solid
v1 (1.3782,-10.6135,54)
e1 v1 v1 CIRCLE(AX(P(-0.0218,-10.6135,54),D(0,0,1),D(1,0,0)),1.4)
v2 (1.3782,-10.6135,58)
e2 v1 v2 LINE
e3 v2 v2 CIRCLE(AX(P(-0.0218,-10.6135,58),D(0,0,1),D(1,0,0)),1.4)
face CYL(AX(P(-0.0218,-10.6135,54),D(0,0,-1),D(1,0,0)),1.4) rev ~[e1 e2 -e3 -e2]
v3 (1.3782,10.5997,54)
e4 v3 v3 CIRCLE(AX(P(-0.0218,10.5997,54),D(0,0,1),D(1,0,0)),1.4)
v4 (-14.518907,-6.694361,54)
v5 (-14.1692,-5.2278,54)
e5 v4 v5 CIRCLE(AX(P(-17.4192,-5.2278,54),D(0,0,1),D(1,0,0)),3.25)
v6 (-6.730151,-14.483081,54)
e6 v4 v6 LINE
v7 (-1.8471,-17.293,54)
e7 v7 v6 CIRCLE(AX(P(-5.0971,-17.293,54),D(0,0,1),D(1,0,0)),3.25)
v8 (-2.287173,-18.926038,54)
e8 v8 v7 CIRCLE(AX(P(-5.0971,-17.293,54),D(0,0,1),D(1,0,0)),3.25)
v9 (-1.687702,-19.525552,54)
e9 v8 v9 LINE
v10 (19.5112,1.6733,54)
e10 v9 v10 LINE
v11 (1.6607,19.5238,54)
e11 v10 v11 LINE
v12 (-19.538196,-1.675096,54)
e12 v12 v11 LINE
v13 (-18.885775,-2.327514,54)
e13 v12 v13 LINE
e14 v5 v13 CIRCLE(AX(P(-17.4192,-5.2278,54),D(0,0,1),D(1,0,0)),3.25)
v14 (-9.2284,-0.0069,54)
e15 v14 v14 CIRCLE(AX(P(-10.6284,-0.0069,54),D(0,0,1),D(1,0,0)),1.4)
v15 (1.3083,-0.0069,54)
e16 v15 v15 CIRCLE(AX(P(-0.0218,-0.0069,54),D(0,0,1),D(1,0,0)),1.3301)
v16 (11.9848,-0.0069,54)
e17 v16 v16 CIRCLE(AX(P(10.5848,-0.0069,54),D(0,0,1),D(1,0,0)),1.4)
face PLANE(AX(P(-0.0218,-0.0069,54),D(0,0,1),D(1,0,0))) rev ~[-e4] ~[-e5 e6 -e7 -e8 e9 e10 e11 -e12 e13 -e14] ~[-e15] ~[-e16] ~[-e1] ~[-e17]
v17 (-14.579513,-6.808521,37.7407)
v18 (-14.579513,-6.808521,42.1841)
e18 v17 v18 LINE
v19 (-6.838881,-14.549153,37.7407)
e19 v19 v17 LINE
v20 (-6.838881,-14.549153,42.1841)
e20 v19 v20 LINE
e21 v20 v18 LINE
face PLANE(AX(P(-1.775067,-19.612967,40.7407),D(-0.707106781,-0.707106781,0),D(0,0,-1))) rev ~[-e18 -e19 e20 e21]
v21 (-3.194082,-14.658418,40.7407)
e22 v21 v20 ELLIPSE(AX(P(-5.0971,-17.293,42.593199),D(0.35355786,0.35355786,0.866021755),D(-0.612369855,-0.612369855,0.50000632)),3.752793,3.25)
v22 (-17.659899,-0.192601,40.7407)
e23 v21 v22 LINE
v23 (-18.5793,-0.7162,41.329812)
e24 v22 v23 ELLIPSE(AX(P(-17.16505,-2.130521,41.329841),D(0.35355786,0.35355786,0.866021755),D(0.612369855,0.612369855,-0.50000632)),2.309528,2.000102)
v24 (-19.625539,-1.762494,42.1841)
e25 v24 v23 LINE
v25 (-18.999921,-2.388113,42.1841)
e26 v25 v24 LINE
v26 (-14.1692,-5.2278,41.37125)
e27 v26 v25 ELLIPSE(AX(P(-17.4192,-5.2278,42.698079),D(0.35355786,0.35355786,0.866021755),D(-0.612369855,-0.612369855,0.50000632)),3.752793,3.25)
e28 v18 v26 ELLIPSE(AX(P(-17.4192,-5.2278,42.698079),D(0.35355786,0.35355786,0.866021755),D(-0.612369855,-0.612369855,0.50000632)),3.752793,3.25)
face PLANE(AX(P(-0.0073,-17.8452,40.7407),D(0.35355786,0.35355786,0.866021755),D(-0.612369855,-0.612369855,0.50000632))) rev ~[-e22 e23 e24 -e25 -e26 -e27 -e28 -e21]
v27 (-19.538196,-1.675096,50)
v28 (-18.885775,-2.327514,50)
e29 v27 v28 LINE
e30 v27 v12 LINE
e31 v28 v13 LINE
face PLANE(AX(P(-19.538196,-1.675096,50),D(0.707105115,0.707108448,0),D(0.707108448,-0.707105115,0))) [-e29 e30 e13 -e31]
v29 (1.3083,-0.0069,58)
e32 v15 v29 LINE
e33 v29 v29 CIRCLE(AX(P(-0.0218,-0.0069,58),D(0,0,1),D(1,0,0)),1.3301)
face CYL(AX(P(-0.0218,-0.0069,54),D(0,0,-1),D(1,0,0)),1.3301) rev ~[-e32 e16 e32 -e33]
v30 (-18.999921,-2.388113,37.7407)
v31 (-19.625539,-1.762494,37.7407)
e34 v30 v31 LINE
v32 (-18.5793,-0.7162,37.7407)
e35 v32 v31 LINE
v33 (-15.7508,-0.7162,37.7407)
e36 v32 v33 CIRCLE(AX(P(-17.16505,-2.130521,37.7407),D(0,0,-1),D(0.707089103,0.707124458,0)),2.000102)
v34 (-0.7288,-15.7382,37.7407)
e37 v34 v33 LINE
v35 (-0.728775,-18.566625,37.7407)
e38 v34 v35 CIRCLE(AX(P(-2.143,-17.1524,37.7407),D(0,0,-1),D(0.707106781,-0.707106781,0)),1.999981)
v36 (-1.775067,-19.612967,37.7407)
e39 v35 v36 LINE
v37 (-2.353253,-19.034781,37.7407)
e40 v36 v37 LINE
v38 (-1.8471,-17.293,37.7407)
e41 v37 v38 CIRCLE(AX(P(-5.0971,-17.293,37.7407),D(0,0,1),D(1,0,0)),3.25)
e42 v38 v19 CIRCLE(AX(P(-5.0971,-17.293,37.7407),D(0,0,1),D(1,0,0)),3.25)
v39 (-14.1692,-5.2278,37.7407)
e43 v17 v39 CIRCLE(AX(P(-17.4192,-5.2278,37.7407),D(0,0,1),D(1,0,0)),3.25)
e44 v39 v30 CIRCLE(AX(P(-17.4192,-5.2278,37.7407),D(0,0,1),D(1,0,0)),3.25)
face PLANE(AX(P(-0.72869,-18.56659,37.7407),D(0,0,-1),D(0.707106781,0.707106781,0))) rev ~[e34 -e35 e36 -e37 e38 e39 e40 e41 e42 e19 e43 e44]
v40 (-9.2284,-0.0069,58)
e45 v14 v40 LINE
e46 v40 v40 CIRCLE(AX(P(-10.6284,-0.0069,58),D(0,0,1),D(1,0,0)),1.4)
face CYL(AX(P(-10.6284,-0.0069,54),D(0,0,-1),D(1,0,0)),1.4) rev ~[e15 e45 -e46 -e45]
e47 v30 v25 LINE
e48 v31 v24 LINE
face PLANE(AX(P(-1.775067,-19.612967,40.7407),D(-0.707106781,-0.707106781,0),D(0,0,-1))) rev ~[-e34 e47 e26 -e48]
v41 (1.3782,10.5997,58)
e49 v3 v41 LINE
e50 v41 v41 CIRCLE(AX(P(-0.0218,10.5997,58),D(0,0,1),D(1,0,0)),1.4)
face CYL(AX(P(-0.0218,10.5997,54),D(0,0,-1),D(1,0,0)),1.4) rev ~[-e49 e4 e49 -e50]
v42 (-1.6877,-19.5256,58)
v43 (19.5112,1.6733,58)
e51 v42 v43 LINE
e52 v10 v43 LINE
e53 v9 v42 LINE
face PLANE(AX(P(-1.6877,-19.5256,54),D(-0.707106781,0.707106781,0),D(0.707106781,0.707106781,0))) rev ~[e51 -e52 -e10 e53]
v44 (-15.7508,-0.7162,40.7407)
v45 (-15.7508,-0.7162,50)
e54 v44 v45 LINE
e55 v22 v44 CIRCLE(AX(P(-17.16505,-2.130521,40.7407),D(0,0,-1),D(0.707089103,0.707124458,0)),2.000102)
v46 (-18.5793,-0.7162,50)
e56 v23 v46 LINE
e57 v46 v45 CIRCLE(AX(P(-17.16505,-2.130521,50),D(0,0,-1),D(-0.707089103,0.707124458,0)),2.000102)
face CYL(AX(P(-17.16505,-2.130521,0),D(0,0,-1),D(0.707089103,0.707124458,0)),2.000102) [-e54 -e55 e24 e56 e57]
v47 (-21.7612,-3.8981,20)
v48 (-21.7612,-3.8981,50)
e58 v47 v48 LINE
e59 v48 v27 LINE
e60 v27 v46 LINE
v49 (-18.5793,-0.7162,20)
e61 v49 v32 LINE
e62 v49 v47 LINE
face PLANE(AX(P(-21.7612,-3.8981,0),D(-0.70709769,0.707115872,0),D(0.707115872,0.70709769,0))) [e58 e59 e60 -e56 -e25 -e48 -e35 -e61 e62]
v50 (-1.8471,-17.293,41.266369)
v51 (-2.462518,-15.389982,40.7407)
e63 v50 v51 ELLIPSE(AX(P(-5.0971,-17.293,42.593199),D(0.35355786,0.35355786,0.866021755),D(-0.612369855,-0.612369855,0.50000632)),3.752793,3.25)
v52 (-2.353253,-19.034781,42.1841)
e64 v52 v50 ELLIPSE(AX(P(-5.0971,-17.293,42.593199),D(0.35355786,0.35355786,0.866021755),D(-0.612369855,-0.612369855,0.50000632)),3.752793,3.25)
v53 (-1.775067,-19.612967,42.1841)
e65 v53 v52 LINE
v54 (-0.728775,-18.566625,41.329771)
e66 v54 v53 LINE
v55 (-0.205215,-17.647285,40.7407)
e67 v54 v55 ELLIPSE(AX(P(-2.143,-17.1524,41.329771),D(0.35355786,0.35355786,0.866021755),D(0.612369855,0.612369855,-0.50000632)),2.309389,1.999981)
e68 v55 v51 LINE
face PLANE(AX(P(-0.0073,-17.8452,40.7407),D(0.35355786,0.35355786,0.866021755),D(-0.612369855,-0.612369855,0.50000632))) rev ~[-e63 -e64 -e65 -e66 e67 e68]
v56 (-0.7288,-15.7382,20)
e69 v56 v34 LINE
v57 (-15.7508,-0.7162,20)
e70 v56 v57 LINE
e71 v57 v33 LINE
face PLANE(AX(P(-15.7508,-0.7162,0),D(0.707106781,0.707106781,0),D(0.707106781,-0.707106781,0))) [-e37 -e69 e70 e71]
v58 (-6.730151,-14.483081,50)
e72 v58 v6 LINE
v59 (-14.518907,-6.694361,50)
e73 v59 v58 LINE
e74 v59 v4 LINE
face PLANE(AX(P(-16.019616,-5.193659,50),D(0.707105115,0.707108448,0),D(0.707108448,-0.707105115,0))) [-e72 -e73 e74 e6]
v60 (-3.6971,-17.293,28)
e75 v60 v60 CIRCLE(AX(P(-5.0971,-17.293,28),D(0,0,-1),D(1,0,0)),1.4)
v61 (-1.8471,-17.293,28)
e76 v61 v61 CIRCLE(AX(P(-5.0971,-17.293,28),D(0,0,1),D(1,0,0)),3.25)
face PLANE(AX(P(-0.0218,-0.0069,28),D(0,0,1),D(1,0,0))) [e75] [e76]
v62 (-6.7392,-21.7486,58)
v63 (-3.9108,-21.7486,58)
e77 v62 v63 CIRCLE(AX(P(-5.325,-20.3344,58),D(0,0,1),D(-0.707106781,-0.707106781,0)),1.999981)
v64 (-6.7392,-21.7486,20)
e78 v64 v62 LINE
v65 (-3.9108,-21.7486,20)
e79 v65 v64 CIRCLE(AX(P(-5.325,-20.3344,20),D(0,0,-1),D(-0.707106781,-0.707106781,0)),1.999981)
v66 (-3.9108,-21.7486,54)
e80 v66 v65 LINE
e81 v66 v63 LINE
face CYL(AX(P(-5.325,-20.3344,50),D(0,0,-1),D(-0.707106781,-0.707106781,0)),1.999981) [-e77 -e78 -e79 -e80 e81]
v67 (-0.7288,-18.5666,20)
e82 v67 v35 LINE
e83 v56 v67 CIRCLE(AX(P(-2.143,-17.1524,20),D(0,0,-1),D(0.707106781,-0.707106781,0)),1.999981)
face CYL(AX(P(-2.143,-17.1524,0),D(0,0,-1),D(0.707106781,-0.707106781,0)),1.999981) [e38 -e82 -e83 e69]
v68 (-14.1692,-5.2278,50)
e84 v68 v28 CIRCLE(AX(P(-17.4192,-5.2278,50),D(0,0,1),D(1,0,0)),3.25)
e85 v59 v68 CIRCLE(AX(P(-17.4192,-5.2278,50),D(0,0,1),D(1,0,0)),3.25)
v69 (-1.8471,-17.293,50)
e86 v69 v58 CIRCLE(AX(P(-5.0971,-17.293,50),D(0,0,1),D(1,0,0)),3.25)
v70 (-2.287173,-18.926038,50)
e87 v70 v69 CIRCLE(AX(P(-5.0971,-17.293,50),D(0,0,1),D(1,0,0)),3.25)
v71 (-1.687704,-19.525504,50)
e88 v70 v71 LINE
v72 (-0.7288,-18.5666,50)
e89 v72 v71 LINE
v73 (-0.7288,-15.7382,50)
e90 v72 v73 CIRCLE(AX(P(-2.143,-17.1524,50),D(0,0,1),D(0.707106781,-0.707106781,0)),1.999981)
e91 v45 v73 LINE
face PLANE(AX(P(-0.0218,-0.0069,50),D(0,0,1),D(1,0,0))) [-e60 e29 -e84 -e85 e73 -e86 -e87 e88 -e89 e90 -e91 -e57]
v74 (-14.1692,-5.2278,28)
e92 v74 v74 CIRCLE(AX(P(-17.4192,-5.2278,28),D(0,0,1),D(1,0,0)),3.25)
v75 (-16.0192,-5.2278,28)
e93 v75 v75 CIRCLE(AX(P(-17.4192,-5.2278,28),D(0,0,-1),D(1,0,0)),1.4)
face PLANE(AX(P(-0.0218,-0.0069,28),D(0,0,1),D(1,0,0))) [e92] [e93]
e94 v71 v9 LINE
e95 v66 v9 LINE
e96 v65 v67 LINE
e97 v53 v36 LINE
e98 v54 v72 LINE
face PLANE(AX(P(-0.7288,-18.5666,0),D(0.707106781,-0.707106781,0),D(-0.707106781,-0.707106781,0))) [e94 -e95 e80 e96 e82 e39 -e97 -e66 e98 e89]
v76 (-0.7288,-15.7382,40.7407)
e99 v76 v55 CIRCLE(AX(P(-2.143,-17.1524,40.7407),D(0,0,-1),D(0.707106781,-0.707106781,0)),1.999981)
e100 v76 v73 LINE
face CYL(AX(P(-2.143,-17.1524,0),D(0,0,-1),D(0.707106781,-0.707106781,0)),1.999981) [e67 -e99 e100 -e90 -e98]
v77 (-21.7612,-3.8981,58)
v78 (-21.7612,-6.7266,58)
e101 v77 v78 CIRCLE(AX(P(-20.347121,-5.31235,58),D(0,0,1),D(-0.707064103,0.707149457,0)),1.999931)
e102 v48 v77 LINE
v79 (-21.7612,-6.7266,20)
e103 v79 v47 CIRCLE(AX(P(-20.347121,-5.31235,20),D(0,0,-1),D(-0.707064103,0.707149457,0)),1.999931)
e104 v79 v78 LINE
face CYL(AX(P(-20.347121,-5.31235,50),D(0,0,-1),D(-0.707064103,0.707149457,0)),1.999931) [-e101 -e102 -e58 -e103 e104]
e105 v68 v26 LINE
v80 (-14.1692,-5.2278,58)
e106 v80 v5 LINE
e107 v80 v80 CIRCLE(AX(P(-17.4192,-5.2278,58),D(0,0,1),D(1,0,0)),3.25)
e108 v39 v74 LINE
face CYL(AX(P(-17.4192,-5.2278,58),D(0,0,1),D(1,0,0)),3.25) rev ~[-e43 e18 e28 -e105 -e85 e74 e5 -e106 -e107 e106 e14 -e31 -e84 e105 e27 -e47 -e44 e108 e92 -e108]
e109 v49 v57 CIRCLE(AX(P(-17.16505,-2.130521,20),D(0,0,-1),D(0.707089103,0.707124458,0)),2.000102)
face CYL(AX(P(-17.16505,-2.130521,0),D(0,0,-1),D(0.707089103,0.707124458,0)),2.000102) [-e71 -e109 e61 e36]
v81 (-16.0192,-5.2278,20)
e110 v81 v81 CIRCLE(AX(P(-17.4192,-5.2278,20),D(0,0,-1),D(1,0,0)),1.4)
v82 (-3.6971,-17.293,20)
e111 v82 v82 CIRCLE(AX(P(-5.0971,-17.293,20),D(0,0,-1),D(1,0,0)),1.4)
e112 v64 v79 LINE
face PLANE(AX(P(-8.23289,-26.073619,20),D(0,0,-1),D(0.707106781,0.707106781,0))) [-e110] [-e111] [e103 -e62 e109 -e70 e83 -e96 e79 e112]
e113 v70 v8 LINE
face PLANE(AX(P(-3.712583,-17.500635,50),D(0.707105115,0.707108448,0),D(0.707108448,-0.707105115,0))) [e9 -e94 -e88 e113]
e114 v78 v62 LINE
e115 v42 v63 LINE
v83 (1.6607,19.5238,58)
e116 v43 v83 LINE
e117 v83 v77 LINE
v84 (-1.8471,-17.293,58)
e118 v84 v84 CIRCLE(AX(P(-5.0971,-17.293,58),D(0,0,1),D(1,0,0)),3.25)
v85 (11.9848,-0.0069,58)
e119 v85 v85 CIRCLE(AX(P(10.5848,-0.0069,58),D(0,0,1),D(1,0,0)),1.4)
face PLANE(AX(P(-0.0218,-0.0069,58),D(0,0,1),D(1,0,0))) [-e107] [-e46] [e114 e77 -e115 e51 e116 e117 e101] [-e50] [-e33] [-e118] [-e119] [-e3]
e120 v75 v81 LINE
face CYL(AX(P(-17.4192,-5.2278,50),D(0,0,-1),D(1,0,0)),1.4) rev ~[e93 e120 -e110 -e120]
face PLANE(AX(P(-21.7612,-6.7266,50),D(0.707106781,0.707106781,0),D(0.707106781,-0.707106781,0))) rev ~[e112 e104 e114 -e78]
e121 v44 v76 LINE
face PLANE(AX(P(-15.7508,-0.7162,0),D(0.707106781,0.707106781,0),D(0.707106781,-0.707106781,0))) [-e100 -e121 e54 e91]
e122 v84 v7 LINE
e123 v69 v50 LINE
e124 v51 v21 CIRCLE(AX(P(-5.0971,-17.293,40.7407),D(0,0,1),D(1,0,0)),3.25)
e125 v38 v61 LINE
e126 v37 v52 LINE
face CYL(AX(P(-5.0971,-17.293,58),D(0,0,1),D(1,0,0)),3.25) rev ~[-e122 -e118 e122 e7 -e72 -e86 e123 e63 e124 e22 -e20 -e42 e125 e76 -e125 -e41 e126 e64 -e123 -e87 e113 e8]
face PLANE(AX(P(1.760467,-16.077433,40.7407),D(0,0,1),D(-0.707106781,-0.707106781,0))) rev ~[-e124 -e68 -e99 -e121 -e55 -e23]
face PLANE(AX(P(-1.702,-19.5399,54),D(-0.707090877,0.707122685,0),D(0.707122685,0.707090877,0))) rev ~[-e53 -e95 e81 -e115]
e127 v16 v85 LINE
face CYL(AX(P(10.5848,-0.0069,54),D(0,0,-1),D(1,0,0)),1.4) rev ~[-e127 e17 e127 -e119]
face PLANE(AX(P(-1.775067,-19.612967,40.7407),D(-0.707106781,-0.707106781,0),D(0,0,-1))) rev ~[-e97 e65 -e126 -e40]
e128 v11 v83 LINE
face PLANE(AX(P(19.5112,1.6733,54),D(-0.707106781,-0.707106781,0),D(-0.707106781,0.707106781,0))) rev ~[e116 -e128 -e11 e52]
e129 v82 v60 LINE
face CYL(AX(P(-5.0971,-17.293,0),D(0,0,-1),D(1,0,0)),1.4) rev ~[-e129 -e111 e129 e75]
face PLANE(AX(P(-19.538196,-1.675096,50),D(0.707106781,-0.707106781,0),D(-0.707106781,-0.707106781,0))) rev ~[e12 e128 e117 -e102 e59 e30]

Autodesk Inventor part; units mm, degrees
ref_plane "YZ Plane" through (0, 0, 0) normal (1, 0, 0) x (0, 1, 0)
ref_plane "XZ Plane" through (0, 0, 0) normal (0, 1, 0) x (-1, 0, 0)
ref_plane "XY Plane" through (0, 0, 0) normal (0, 0, 1) x (1, 0, 0)
ref_plane "Arbeitsebene1" through (-0.0218, -0.0069, 0) normal (0, 0, 1) x (1, 0, 0)
sketch "Skizze1" plane through (-0.0218, -0.0069, 0) normal (0, 0, 1) x (1, 0, 0)
  circle A0 centre (-5.0753, -17.2861) radius 1.4
  circle A1 centre (-17.3974, -5.2209) radius 1.4
  arc A2 (5.7175, 26.2743) -> (7.9904, 25.6763) centre (6.0829, 23.0449) ccw
  arc A3 (5.7175, 26.2743) -> (-18.7943, -19.1862) centre (0.0218, 0.0069) ccw
  arc A4 (-18.1485, -19.7987) -> (-18.7943, -19.1862) centre (-16.256, -17.1565) ccw
  arc A5 (-18.1485, -19.7987) -> (25.9771, 6.988) centre (0.0218, 0.0069) ccw
  arc A6 (25.268, 9.2287) -> (25.9771, 6.988) centre (22.7337, 7.1941) ccw
  arc A7 (25.268, 9.2287) -> (7.9904, 25.6763) centre (0.0218, 0.0069) ccw
  spline S0 degree 3 poles (-11.5335, -6.2903) (-11.3493, -6.4745) (-11.2029, -6.6929) (-11.002, -7.1734) (-10.9495, -7.431) (-10.9461, -7.9517) (-10.9953, -8.2099) (-11.1865, -8.6846) (-11.3236, -8.8981) (-11.4967, -9.0805) knots 0 0 0 0 0.252225 0.252225 0.504373 0.504373 0.756494 0.756494 1 1 1 1
  line L0 (-11.5335, -6.2903) -> (-16.328, -1.4959)
  arc A8 (-16.328, 1.5053) -> (-16.328, -1.4959) centre (-14.8274, 0.0047) ccw
  line L1 (-16.328, 1.5053) -> (-1.4787, 16.3546)
  arc A9 (1.5225, 16.3546) -> (-1.4787, 16.3546) centre (0.0219, 14.854) ccw
  line L2 (1.5225, 16.3546) -> (16.3717, 1.5053)
  arc A10 (16.3717, -1.4959) -> (16.3717, 1.5053) centre (14.8711, 0.0047) ccw
  line L3 (16.3717, -1.4959) -> (1.5225, -16.3451)
  arc A11 (-1.4787, -16.3451) -> (1.5225, -16.3451) centre (0.0219, -14.8445) ccw
  line L4 (-1.4787, -16.3451) -> (-4.7731, -13.0507)
  spline S1 degree 3 poles (-7.5633, -13.0139) (-7.3743, -12.8347) (-7.1521, -12.694) (-6.6664, -12.5059) (-6.4076, -12.4602) (-5.8869, -12.4706) (-5.6301, -12.5266) (-5.1606, -12.7303) (-4.9509, -12.873) (-4.7731, -13.0507) knots 0 0 0 0 0.252231 0.252231 0.504388 0.504388 0.756517 0.756517 1 1 1 1
  arc A12 (-11.4967, -9.0805) -> (-7.5633, -13.0139) centre (-9.478, -10.9953) ccw
  line L5 (-17.3974, -5.2209) -> (-5.0753, -17.2861)
  line L6 (-17.8503, -0.0022) -> (0.0001, -17.8526)
  line L7 (0.0001, -17.8526) -> (-3.889, -21.7417)
  line L8 (-6.7174, -21.7417) -> (-21.7394, -6.7197)
  line L9 (-21.7394, -3.8912) -> (-17.8503, -0.0022)
  arc A13 (-21.7394, -3.8912) -> (-21.7394, -6.7197) centre (-20.3252, -5.3055) ccw
  arc A14 (-6.7174, -21.7417) -> (-3.889, -21.7417) centre (-5.3032, -20.3275) ccw
  line L10 (-17.8503, -0.0022) -> (-18.5575, -0.7093)
  line L11 (-15.729, -0.7093) -> (-0.707, -15.7313)
  line L12 (-0.707, -18.5597) -> (0.0001, -17.8526)
  line L13 (0.0001, -17.8526) -> (-17.8503, -0.0022)
  arc A15 (-15.729, -0.7093) -> (-18.5575, -0.7093) centre (-17.1432, -2.1235) ccw
  arc A16 (-0.707, -18.5597) -> (-0.707, -15.7313) centre (-2.1212, -17.1455) ccw
  circle A17 centre (5.2496, -17.4123) radius 1.4
  circle A18 centre (17.3147, -5.0902) radius 1.4
  point P0 (0.0218, 0.0069)
  point P1 (-5.3032, -23.1559)
  point P2 (-11.5553, -6.2972)
  point P3 (-16.3497, -1.5028)
  point P4 (-1.5005, -16.352)
  point P5 (-4.7949, -13.0576)
  point P6 (-17.1432, 0.705)
  dimension "d0" = 7.5
  dimension "d1" = 2
  dimension "d23" = 1
  dimension "d24" = 2
extrude "Extrusion1" add sketch "Skizze1" along normal blind 50 contours L0 A8 A15 L11 A16 A11 L4 S1 L6 S0 | S0 L6 A15 A8 L0 | L6 S1 A12 L5 S0 | S0 A12 S1 L6 A16 L7 A14 L8 A13 L9 A15 | S1 L4 A11 A16 L6 | L5 A12
sketch "Skizze2" plane through (-0.0218, -0.0069, 50) normal (0, 0, 1) x (1, 0, 0)
  line L0 (-21.1915, 0.0069) -> (0.0218, -21.2063) projected
  line L1 (-18.5575, -0.7093) -> (-21.7394, -3.8912) projected
  arc A0 (-21.7394, -3.8912) -> (-21.7394, -6.7197) centre (-20.3252, -5.3055) ccw projected
  line L2 (-21.7394, -6.7197) -> (-6.7174, -21.7417) projected
  arc A1 (-6.7174, -21.7417) -> (-3.889, -21.7417) centre (-5.3032, -20.3275) ccw projected
  line L3 (-3.889, -21.7417) -> (-0.707, -18.5597) projected
  circle A2 centre (-17.3974, -5.2209) radius 1.4 projected
  circle A3 centre (-5.0753, -17.2861) radius 1.4 projected
  arc A4 (-0.707, -18.5597) -> (-0.707, -15.7313) centre (-2.1212, -17.1455) ccw projected
  line L4 (-0.707, -15.7313) -> (-15.729, -0.7093) projected
  arc A5 (-15.729, -0.7093) -> (-18.5575, -0.7093) centre (-17.1432, -2.1235) ccw projected
  point P0 (0.0218, 0.0069)
  point P1 (-1.6659, -19.5187)
  point P2 (-3.6908, -17.4938)
  point P3 (-5.283, -15.9016)
  point P4 (-15.9978, -5.1867)
  point P5 (-17.3632, -3.8213)
  point P6 (-19.5164, -1.6682)
extrude "Extrusion2" add sketch "Skizze2" along normal blind 4 contours L0 A2 A3 L3 A1 L2 A0 L1
sketch "Skizze3" plane through (-0.0218, -0.0069, 54) normal (0, 0, 1) x (1, 0, 0)
  line L0 (21.2132, 0) -> (0, 21.2132) projected
  line L1 (0, 21.2132) -> (-21.2132, 0) projected
  line L2 (-21.2132, 0) -> (0, -21.2132) projected
  line L3 (0, -21.2132) -> (21.2132, 0) projected
  circle A0 centre (0, 0) radius 1.3301 projected
  circle A1 centre (-10.6066, 0) radius 1.5 projected
  circle A2 centre (0, -10.6066) radius 1.5 projected
  circle A3 centre (10.6066, 0) radius 1.5 projected
  circle A4 centre (0, 10.6066) radius 1.5 projected
  line L4 (-3.889, -21.7417) -> (-1.6659, -19.5187) projected
  line L5 (-1.6659, -19.5187) -> (-3.6908, -17.4938) projected
  arc A5 (-5.283, -15.9016) -> (-3.6908, -17.4938) centre (-5.0753, -17.2861) ccw projected
  line L6 (-5.283, -15.9016) -> (-15.9978, -5.1867) projected
  arc A6 (-17.3632, -3.8213) -> (-15.9978, -5.1867) centre (-17.3974, -5.2209) ccw projected
  line L7 (-17.3632, -3.8213) -> (-19.5164, -1.6682) projected
  line L8 (-19.5164, -1.6682) -> (-21.7394, -3.8912) projected
  arc A7 (-21.7394, -3.8912) -> (-21.7394, -6.7197) centre (-20.3252, -5.3055) ccw projected
  line L9 (-21.7394, -6.7197) -> (-6.7174, -21.7417) projected
  arc A8 (-6.7174, -21.7417) -> (-3.889, -21.7417) centre (-5.3032, -20.3275) ccw projected
  arc A9 (-15.9978, -5.1867) -> (-17.3632, -3.8213) centre (-17.3974, -5.2209) ccw projected
  arc A10 (-3.6908, -17.4938) -> (-5.283, -15.9016) centre (-5.0753, -17.2861) ccw projected
  circle A11 centre (-10.6066, 0) radius 1.4
  circle A12 centre (0, 10.6066) radius 1.4
  circle A13 centre (10.6066, 0) radius 1.4
  circle A14 centre (0, -10.6066) radius 1.4
  line L10 (-19.5164, -1.6682) -> (1.6825, 19.5307)
  line L11 (-1.6659, -19.5187) -> (19.533, 1.6802)
  point P0 (0.0218, 0.0069)
  point P1 (-19.5307, -1.6825)
  point P2 (-1.6802, -19.533)
  dimension "d14" = 2.8
  dimension "d15" = 2.8
  dimension "d16" = 2.8
  dimension "d17" = 2.8
extrude "Extrusion3" add sketch "Skizze3" along normal blind 4 contours L11 L5 A10 L6 A9 L7 L10 L0 | L4 L2 A5 L5 | L4 A8 L9 A7 L8 L2 A6 A5 | L7 A6 L2 L8 | A5 L2 A6 L6 | A1 | A2 | A3 | A4
sketch "Skizze4" plane through (-0.0073, -17.8452, 50) normal (0.7071068, -0.7071068, 0) x (-0.7071068, -0.7071068, 0)
  line L0 (5.5202, 50) -> (1.0202, 50) projected
  line L1 (2.3764, 0) -> (1.0202, 0) projected
  line L2 (2.3764, 0) -> (2.3764, -4) projected
  line L3 (5.5202, -8) -> (-27.6034, -8) projected
  line L4 (5.5202, 50) -> (5.5202, -8) projected
  line L5 (-2.5, 9.2593) -> (2.5, 9.2593)
  line L6 (2.5, 9.2593) -> (2.5, 12.2593)
  line L7 (2.5, 12.2593) -> (-2.5, 12.2593)
  line L8 (-2.5, 12.2593) -> (-2.5, 9.2593)
  line L9 (-2.5, 9.2593) -> (2.5, 12.2593) construction
  line L10 (2.5, 9.2593) -> (-2.5, 12.2593) construction
  line L11 (0, 9.2593) -> (2.5, 7.8159)
  line L12 (0, 9.2593) -> (2.8868, 9.2593) construction
  line L13 (2.5, 7.8159) -> (2.5, 13.7027)
  line L14 (2.5, 13.7027) -> (0, 12.2593)
  line L15 (2.3764, -4) -> (-27.6034, -4) projected
  line L16 (-27.6034, -4) -> (-27.6034, -8) projected
  line L17 (1.0202, 50) -> (1.0202, 0) projected
  point P0 (-12.6236, 50)
  point P1 (0, 10.7593)
  point P2 (2.5, 9.2593)
  dimension "d8" = 5
  dimension "d9" = 3
  dimension "d10" = 30
  dimension "d11" = 30
extrude "Extrusion4" cut sketch "Skizze4" against normal through all contours L7 L17 L5 L8 | L7 L6 L5 L17 | L17 L11 L5 | L5 L13 L11 L17
sketch "Skizze5" plane through (-0.0218, -0.0069, 58) normal (0, 0, 1) x (1, 0, 0)
  circle A0 centre (-17.3974, -5.2209) radius 1.4 projected
  circle A1 centre (-5.0753, -17.2861) radius 1.4 projected
  circle A2 centre (-17.3974, -5.2209) radius 3.25
  circle A3 centre (-5.0753, -17.2861) radius 3.25
  point P0 (0.0218, 0.0069)
  dimension "d19" = 6.5
  dimension "d20" = 6.5
extrude "Extrusion5" cut sketch "Skizze5" against normal blind 30 contours A0 | A1 | A2 | A3
sketch "Skizze6" plane through (-3.9107, -21.7486, 58) normal (0.7071068, -0.7071068, 0) x (-0.7071068, -0.7071068, 0)
  line L0 (0.9383, 30) -> (-5.5617, 30) projected
  line L1 (-14.2171, 61.056) -> (6.1145, 61.056)
  line L2 (6.1145, 61.056) -> (6.1145, 38)
  line L3 (6.1145, 38) -> (-14.2171, 38)
  line L4 (-14.2171, 38) -> (-14.2171, 61.056)
  line L5 (0, 58) -> (-4.5, 58) projected
  point P0 (-18.1439, 58)
  dimension "d25" = 20
extrude "Extrusion6" cut sketch "Skizze6" against normal blind 50
properties part number "IM_ledmatrix_holder"
